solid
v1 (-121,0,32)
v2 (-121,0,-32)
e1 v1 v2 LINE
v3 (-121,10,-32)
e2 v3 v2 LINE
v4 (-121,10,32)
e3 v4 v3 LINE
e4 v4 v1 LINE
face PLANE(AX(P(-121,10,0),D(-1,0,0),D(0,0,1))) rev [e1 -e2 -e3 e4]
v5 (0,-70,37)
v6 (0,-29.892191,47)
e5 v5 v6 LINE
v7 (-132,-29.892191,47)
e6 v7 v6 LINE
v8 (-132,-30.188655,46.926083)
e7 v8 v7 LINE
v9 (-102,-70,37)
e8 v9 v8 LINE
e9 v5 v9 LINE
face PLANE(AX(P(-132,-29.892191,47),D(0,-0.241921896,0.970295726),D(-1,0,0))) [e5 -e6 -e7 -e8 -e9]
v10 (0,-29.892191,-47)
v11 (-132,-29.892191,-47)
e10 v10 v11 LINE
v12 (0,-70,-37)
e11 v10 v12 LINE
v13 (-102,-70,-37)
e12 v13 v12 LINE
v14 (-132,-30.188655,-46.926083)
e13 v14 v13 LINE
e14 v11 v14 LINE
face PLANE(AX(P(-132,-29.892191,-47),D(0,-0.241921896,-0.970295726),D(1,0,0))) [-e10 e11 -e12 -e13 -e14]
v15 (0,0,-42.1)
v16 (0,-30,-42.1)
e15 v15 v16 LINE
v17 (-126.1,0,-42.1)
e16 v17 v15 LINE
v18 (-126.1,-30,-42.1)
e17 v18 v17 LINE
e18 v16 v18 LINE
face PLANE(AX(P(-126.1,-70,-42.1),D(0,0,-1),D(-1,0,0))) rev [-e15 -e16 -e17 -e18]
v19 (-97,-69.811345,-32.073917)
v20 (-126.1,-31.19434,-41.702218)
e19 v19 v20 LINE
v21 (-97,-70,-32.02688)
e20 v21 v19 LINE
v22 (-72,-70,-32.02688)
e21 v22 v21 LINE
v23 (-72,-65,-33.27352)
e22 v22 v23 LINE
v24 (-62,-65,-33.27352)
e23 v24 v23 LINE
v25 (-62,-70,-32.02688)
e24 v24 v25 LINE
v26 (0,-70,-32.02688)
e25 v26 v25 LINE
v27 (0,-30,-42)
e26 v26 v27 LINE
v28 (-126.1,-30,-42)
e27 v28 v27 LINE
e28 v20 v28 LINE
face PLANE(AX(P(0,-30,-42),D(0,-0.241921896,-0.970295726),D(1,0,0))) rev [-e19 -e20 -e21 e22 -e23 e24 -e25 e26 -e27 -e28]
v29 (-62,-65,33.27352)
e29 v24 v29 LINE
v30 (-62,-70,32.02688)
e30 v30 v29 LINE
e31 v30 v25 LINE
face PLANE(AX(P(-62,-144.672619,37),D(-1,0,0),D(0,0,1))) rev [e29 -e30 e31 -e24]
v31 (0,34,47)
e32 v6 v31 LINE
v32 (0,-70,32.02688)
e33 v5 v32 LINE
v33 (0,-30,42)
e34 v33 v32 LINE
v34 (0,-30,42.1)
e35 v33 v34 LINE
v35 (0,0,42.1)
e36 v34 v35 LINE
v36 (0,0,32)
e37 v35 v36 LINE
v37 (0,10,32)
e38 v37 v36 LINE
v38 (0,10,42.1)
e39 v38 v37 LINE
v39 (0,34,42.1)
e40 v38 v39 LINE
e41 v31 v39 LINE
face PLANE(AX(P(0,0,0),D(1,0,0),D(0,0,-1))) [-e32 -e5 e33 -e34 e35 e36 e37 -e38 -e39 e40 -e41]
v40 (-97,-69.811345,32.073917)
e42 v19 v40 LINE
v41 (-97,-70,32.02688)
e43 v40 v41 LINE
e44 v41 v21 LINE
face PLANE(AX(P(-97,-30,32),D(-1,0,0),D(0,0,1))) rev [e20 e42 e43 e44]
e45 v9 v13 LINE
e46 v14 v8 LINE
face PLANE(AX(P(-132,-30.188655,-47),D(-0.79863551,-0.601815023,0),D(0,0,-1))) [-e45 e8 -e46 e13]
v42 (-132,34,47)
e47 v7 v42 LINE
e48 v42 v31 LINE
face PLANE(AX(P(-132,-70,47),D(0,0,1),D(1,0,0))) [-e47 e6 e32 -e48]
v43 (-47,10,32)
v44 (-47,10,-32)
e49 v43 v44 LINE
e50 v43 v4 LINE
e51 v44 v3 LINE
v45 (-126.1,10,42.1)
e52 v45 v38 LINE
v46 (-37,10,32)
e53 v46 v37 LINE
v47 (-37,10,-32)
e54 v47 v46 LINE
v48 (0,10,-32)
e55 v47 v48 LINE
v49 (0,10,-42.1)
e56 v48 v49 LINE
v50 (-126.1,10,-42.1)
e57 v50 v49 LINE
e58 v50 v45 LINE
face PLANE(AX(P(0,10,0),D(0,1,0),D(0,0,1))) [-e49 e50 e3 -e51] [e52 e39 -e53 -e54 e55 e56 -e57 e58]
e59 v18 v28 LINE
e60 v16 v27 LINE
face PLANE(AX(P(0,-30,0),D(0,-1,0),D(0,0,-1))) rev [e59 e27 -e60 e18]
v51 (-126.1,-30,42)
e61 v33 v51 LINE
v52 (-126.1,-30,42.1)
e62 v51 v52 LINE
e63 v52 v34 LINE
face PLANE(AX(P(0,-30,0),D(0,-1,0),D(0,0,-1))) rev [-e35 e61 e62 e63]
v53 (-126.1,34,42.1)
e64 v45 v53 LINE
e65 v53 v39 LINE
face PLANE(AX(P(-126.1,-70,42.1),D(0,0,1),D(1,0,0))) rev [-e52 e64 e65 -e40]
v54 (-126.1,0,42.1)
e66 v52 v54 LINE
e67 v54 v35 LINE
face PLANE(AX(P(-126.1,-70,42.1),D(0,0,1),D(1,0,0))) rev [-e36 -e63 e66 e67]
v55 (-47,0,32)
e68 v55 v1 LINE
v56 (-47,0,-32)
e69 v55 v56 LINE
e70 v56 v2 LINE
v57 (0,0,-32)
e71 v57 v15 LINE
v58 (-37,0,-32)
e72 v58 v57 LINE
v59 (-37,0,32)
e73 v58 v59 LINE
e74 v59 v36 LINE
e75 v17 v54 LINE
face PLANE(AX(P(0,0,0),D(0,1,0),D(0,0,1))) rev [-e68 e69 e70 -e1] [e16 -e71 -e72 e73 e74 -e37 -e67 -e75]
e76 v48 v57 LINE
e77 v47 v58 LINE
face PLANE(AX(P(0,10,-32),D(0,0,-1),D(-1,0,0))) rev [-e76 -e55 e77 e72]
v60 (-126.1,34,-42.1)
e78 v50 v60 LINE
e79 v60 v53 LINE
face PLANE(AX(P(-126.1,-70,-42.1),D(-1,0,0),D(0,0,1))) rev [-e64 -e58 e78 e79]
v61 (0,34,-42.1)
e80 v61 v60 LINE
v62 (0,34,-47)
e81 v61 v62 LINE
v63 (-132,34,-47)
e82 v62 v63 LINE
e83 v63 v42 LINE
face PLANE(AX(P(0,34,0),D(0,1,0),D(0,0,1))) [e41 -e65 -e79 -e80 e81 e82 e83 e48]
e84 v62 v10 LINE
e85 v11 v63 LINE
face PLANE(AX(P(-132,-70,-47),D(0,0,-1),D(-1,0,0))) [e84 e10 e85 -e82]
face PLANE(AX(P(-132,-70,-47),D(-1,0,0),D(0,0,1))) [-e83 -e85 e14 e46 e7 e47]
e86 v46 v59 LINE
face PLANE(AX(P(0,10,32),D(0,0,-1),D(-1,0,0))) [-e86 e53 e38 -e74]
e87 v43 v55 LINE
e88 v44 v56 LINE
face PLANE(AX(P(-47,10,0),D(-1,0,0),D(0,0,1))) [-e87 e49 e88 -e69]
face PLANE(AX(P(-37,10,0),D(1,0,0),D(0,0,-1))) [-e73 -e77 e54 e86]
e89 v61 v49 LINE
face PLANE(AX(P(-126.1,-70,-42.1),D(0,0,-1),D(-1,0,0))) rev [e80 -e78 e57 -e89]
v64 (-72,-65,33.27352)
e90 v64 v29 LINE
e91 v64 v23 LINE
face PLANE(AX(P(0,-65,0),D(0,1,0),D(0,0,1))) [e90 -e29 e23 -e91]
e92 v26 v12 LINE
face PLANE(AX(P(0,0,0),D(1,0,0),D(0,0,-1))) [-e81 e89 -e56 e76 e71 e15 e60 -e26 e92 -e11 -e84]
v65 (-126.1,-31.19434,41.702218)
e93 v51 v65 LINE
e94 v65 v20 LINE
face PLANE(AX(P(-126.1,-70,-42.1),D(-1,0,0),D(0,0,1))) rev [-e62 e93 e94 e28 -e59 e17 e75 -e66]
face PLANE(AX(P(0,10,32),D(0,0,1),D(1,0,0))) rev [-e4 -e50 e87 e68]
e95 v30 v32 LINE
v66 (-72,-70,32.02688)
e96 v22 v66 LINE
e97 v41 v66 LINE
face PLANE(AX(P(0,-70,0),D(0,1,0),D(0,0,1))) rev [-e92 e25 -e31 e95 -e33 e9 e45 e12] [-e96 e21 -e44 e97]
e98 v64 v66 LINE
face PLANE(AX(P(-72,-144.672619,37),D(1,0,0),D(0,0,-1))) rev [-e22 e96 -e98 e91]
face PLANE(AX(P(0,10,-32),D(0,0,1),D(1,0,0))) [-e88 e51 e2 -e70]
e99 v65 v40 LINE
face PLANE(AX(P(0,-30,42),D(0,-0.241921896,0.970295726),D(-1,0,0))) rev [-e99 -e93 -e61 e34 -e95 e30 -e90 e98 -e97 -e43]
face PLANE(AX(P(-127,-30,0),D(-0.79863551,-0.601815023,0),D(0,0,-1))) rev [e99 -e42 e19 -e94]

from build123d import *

# Parameters (mm, degrees)
SKETCH1_W                = 74
SKETCH1_H                = 64
BOSS_EXTRUDE3_DEPTH      = 10
BOSS_EXTRUDE4_DEPTH      = 24
BOSS_EXTRUDE4_DEPTH_BACK = 80
SKETCH3_W                = 264
SKETCH3_H                = 94
SKETCH3_W_2              = 252.2
SKETCH3_H_2              = 84.2
SKETCH4_W                = 264
SKETCH4_H                = 94
SKETCH4_W_2              = 194
SKETCH4_H_2              = 64
BOSS_EXTRUDE5_DEPTH      = 40
CHAMFER4_SIZE            = 39.811344649
CHAMFER4_SIZE_2          = 30
CHAMFER7_SIZE            = 39.811344649
CHAMFER7_SIZE_2          = 30
CHAMFER8_SIZE            = 10
CHAMFER8_SIZE_2          = 40.107809335
CHAMFER9_SIZE            = 40.107809335
CHAMFER9_SIZE_2          = 10
SKETCH7_W                = 10
SKETCH7_H                = 74
BOSS_EXTRUDE6_DEPTH      = 5


with BuildPart() as part:
    # Sketch1 → Boss-Extrude3 (new body)
    with BuildSketch(Plane(origin=(0, 0, 0), x_dir=(1, 0, 0), z_dir=(0, 1, 0))):
        Polygon((-47, 42.1), (-126.1, 42.1), (-126.1, -42.1), (-47, -42.1), (-37, -42.1), (37, -42.1), (47, -42.1), (126.1, -42.1), (126.1, 42.1), (47, 42.1), (37, 42.1), (-37, 42.1), align=None)
        with Locations((-84, 0)):
            Rectangle(SKETCH1_W, SKETCH1_H, mode=Mode.SUBTRACT)
        Rectangle(SKETCH1_W, SKETCH1_H, mode=Mode.SUBTRACT)
        with Locations((84, 0)):
            Rectangle(SKETCH1_W, SKETCH1_H, mode=Mode.SUBTRACT)
    extrude(amount=BOSS_EXTRUDE3_DEPTH)

    # Sketch3 → Boss-Extrude4 (add, two sides: drawn at the far end of the back side and taken through both)
    with BuildSketch(Plane(origin=(0, 10, 0), x_dir=(1, 0, 0), z_dir=(0, 1, 0)).offset(-BOSS_EXTRUDE4_DEPTH_BACK)):
        Rectangle(SKETCH3_W, SKETCH3_H)
        Rectangle(SKETCH3_W_2, SKETCH3_H_2, mode=Mode.SUBTRACT)
    extrude(amount=BOSS_EXTRUDE4_DEPTH + BOSS_EXTRUDE4_DEPTH_BACK)

    # Sketch4 → Boss-Extrude5 (add)
    with BuildSketch(Plane(origin=(0, -70, 0), x_dir=(-1, 0, 0), z_dir=(0, -1, 0))):
        Rectangle(SKETCH4_W, SKETCH4_H)
        Rectangle(SKETCH4_W_2, SKETCH4_H_2, mode=Mode.SUBTRACT)
    extrude(amount=-BOSS_EXTRUDE5_DEPTH)

    # Chamfer4
    # the kernel refuses this chamfer: 39.811344649, 30 mm, written as the material it takes off along each edge
    with BuildSketch(Plane(origin=(-132, -70, 149.735778307), x_dir=(-0.023321052992758384, 0.9997280272590686, 0), z_dir=(0, 0, -1))) as chamfer4_piece_1:
        Polygon((CHAMFER4_SIZE * 0.999728027249, CHAMFER4_SIZE * 0.0233210529925), (-CHAMFER4_SIZE_2 * 0.0233210529928, CHAMFER4_SIZE_2 * 0.999728027259), (0, 0), align=None)
    extrude(amount=299.471556613, mode=Mode.SUBTRACT)
    with BuildSketch(Plane(origin=(-97, -30, 32), x_dir=(-0.9991572559820394, 0.04104604510109794, 0), z_dir=(0, 0, -1))) as chamfer4_piece_2_section:
        Polygon((CHAMFER4_SIZE_2 * 0.999157255982, -CHAMFER4_SIZE_2 * 0.0410460451011), (-CHAMFER4_SIZE * 0.0410460451007, -CHAMFER4_SIZE * 0.999157255972), (0, 0), align=None)
    chamfer4_piece_2 = extrude(amount=64, mode=Mode.PRIVATE)
    chamfer4_piece_2 = split(chamfer4_piece_2, bisect_by=Plane(origin=(-126.1, -43.282043753, 0), z_dir=(1, 0, 0)), keep=Keep.TOP, mode=Mode.PRIVATE)
    add(chamfer4_piece_2, mode=Mode.SUBTRACT)

    # Chamfer7
    # the kernel refuses this chamfer: 39.811344649, 30 mm, written as the material it takes off along each edge
    with BuildSketch(Plane(origin=(132, -70, -149.735778307), x_dir=(0.02332105299275837, 0.9997280272590686, 0), z_dir=(0, 0, 1))) as chamfer7_piece_1:
        Polygon((CHAMFER7_SIZE * 0.999728027249, CHAMFER7_SIZE * 0.0233210529925), (-CHAMFER7_SIZE_2 * 0.0233210529928, CHAMFER7_SIZE_2 * 0.999728027259), (0, 0), align=None)
    extrude(amount=299.471556613, mode=Mode.SUBTRACT)
    with BuildSketch(Plane(origin=(97, -30, -32), x_dir=(0.9991572559820394, 0.04104604510109794, 0), z_dir=(0, 0, 1))) as chamfer7_piece_2_section:
        Polygon((CHAMFER7_SIZE_2 * 0.999157255982, -CHAMFER7_SIZE_2 * 0.0410460451011), (-CHAMFER7_SIZE * 0.0410460451007, -CHAMFER7_SIZE * 0.999157255972), (0, 0), align=None)
    chamfer7_piece_2 = extrude(amount=64, mode=Mode.PRIVATE)
    chamfer7_piece_2 = split(chamfer7_piece_2, bisect_by=Plane(origin=(126.1, -43.282043753, 0), z_dir=(-1, 0, 0)), keep=Keep.TOP, mode=Mode.PRIVATE)
    add(chamfer7_piece_2, mode=Mode.SUBTRACT)

    # Chamfer8
    # the kernel refuses this chamfer: 40.107809335, 10 mm, written as the material it takes off along each edge
    with BuildSketch(Plane(origin=(230.265686152, -30, -32), x_dir=(0, 0.14819517765013807, -0.9889581332499592), z_dir=(-1, 0, 0))) as chamfer8_piece_1_section:
        Polygon((CHAMFER8_SIZE * 0.98895813325, CHAMFER8_SIZE * 0.14819517765), (-CHAMFER8_SIZE_2 * 0.148195177651, CHAMFER8_SIZE_2 * 0.988958133259), (0, 0), align=None)
    chamfer8_piece_1 = extrude(amount=460.531372304, mode=Mode.PRIVATE)
    chamfer8_piece_1 = split(chamfer8_piece_1, bisect_by=Plane(origin=(97, -69.925531208, -32.022723521), z_dir=(-1, 0, 0)), keep=Keep.TOP, mode=Mode.PRIVATE)
    chamfer8_piece_1 = split(chamfer8_piece_1, bisect_by=Plane(origin=(-97, -69.925531208, -32.022723521), z_dir=(1, 0, 0)), keep=Keep.TOP, mode=Mode.PRIVATE)
    add(chamfer8_piece_1, mode=Mode.SUBTRACT)
    with BuildSketch(Plane(origin=(126.1, -30, -32), x_dir=(0, 0.14819517765040952, -0.9889581332499185), z_dir=(-1, 0, 0))) as chamfer8_piece_2_section:
        Polygon((CHAMFER8_SIZE * 0.98895813325, CHAMFER8_SIZE * 0.14819517765), (-CHAMFER8_SIZE_2 * 0.148195177652, CHAMFER8_SIZE_2 * 0.988958133259), (0, 0), align=None)
    chamfer8_piece_2 = extrude(amount=252.2, mode=Mode.PRIVATE)
    chamfer8_piece_2 = split(chamfer8_piece_2, bisect_by=Plane(origin=(115.387923489, -45.409746002, -35.753076102), z_dir=(-0.7986355100471506, 0.6018150231522371, 0)), keep=Keep.TOP, mode=Mode.PRIVATE)
    chamfer8_piece_2 = split(chamfer8_piece_2, bisect_by=Plane(origin=(-37.003214765, -149.429767809, -35.753076102), z_dir=(0.7986355100471506, 0.6018150231522371, 0)), keep=Keep.TOP, mode=Mode.PRIVATE)
    add(chamfer8_piece_2, mode=Mode.SUBTRACT)
    with BuildSketch(Plane(origin=(-206.165686152, -70, -47), x_dir=(0, 0.9999566151296001, -0.009314926653100013), z_dir=(1, 0, 0))) as chamfer8_piece_3:
        Polygon((CHAMFER8_SIZE_2 * 0.999956615139, CHAMFER8_SIZE_2 * 0.00931492665318), (-CHAMFER8_SIZE * 0.0093149266531, CHAMFER8_SIZE * 0.99995661513), (0, 0), align=None)
    extrude(amount=412.331372304, mode=Mode.SUBTRACT)

    # Chamfer9
    # the kernel refuses this chamfer: 40.107809335, 10 mm, written as the material it takes off along each edge
    with BuildSketch(Plane(origin=(-126.1, -30, 32), x_dir=(0, -0.9999566151296001, -0.009314926653099073), z_dir=(1, 0, 0))) as chamfer9_piece_1_section:
        Polygon((CHAMFER9_SIZE * 0.999956615139, -CHAMFER9_SIZE * 0.00931492665318), (-CHAMFER9_SIZE_2 * 0.00931492665339, -CHAMFER9_SIZE_2 * 0.99995661513), (0, 0), align=None)
    chamfer9_piece_1 = extrude(amount=252.2, mode=Mode.PRIVATE)
    chamfer9_piece_1 = split(chamfer9_piece_1, bisect_by=Plane(origin=(37.003214765, -149.429767809, 35.753076102), z_dir=(-0.7986355100471506, 0.6018150231522371, 0)), keep=Keep.TOP, mode=Mode.PRIVATE)
    chamfer9_piece_1 = split(chamfer9_piece_1, bisect_by=Plane(origin=(-115.387923489, -45.409746002, 35.753076102), z_dir=(0.79863551004721, 0.6018150231521583, 0)), keep=Keep.TOP, mode=Mode.PRIVATE)
    add(chamfer9_piece_1, mode=Mode.SUBTRACT)
    with BuildSketch(Plane(origin=(-230.265686152, -30, 32), x_dir=(0, -0.9999566151296001, -0.00931492665310001), z_dir=(1, 0, 0))) as chamfer9_piece_2_section:
        Polygon((CHAMFER9_SIZE * 0.999956615139, -CHAMFER9_SIZE * 0.00931492665318), (-CHAMFER9_SIZE_2 * 0.0093149266531, -CHAMFER9_SIZE_2 * 0.99995661513), (0, 0), align=None)
    chamfer9_piece_2 = extrude(amount=460.531372304, mode=Mode.PRIVATE)
    chamfer9_piece_2 = split(chamfer9_piece_2, bisect_by=Plane(origin=(97, -69.925531208, 32.022723521), z_dir=(-1, 0, 0)), keep=Keep.TOP, mode=Mode.PRIVATE)
    chamfer9_piece_2 = split(chamfer9_piece_2, bisect_by=Plane(origin=(-97, -69.925531208, 32.022723521), z_dir=(1, 0, 0)), keep=Keep.TOP, mode=Mode.PRIVATE)
    add(chamfer9_piece_2, mode=Mode.SUBTRACT)
    with BuildSketch(Plane(origin=(206.165686152, -70, 47), x_dir=(0, -0.1481951776501387, -0.9889581332499591), z_dir=(-1, 0, 0))) as chamfer9_piece_3:
        Polygon((CHAMFER9_SIZE_2 * 0.98895813325, -CHAMFER9_SIZE_2 * 0.14819517765), (-CHAMFER9_SIZE * 0.148195177651, -CHAMFER9_SIZE * 0.988958133259), (0, 0), align=None)
    extrude(amount=412.331372304, mode=Mode.SUBTRACT)

    # Split1
    split(bisect_by=Plane(origin=(0, 0, 0), x_dir=(0, 0, 1), z_dir=(1, 0, 0)), keep=Keep.BOTTOM)

    # Sketch7 → Boss-Extrude6 (add)
    with BuildSketch(Plane(origin=(0, -65, 0), x_dir=(-1, 0, 0), z_dir=(0, -1, 0))):
        with Locations((67, 0)):
            Rectangle(SKETCH7_W, SKETCH7_H)
    extrude(amount=BOSS_EXTRUDE6_DEPTH)


solid = part.part
